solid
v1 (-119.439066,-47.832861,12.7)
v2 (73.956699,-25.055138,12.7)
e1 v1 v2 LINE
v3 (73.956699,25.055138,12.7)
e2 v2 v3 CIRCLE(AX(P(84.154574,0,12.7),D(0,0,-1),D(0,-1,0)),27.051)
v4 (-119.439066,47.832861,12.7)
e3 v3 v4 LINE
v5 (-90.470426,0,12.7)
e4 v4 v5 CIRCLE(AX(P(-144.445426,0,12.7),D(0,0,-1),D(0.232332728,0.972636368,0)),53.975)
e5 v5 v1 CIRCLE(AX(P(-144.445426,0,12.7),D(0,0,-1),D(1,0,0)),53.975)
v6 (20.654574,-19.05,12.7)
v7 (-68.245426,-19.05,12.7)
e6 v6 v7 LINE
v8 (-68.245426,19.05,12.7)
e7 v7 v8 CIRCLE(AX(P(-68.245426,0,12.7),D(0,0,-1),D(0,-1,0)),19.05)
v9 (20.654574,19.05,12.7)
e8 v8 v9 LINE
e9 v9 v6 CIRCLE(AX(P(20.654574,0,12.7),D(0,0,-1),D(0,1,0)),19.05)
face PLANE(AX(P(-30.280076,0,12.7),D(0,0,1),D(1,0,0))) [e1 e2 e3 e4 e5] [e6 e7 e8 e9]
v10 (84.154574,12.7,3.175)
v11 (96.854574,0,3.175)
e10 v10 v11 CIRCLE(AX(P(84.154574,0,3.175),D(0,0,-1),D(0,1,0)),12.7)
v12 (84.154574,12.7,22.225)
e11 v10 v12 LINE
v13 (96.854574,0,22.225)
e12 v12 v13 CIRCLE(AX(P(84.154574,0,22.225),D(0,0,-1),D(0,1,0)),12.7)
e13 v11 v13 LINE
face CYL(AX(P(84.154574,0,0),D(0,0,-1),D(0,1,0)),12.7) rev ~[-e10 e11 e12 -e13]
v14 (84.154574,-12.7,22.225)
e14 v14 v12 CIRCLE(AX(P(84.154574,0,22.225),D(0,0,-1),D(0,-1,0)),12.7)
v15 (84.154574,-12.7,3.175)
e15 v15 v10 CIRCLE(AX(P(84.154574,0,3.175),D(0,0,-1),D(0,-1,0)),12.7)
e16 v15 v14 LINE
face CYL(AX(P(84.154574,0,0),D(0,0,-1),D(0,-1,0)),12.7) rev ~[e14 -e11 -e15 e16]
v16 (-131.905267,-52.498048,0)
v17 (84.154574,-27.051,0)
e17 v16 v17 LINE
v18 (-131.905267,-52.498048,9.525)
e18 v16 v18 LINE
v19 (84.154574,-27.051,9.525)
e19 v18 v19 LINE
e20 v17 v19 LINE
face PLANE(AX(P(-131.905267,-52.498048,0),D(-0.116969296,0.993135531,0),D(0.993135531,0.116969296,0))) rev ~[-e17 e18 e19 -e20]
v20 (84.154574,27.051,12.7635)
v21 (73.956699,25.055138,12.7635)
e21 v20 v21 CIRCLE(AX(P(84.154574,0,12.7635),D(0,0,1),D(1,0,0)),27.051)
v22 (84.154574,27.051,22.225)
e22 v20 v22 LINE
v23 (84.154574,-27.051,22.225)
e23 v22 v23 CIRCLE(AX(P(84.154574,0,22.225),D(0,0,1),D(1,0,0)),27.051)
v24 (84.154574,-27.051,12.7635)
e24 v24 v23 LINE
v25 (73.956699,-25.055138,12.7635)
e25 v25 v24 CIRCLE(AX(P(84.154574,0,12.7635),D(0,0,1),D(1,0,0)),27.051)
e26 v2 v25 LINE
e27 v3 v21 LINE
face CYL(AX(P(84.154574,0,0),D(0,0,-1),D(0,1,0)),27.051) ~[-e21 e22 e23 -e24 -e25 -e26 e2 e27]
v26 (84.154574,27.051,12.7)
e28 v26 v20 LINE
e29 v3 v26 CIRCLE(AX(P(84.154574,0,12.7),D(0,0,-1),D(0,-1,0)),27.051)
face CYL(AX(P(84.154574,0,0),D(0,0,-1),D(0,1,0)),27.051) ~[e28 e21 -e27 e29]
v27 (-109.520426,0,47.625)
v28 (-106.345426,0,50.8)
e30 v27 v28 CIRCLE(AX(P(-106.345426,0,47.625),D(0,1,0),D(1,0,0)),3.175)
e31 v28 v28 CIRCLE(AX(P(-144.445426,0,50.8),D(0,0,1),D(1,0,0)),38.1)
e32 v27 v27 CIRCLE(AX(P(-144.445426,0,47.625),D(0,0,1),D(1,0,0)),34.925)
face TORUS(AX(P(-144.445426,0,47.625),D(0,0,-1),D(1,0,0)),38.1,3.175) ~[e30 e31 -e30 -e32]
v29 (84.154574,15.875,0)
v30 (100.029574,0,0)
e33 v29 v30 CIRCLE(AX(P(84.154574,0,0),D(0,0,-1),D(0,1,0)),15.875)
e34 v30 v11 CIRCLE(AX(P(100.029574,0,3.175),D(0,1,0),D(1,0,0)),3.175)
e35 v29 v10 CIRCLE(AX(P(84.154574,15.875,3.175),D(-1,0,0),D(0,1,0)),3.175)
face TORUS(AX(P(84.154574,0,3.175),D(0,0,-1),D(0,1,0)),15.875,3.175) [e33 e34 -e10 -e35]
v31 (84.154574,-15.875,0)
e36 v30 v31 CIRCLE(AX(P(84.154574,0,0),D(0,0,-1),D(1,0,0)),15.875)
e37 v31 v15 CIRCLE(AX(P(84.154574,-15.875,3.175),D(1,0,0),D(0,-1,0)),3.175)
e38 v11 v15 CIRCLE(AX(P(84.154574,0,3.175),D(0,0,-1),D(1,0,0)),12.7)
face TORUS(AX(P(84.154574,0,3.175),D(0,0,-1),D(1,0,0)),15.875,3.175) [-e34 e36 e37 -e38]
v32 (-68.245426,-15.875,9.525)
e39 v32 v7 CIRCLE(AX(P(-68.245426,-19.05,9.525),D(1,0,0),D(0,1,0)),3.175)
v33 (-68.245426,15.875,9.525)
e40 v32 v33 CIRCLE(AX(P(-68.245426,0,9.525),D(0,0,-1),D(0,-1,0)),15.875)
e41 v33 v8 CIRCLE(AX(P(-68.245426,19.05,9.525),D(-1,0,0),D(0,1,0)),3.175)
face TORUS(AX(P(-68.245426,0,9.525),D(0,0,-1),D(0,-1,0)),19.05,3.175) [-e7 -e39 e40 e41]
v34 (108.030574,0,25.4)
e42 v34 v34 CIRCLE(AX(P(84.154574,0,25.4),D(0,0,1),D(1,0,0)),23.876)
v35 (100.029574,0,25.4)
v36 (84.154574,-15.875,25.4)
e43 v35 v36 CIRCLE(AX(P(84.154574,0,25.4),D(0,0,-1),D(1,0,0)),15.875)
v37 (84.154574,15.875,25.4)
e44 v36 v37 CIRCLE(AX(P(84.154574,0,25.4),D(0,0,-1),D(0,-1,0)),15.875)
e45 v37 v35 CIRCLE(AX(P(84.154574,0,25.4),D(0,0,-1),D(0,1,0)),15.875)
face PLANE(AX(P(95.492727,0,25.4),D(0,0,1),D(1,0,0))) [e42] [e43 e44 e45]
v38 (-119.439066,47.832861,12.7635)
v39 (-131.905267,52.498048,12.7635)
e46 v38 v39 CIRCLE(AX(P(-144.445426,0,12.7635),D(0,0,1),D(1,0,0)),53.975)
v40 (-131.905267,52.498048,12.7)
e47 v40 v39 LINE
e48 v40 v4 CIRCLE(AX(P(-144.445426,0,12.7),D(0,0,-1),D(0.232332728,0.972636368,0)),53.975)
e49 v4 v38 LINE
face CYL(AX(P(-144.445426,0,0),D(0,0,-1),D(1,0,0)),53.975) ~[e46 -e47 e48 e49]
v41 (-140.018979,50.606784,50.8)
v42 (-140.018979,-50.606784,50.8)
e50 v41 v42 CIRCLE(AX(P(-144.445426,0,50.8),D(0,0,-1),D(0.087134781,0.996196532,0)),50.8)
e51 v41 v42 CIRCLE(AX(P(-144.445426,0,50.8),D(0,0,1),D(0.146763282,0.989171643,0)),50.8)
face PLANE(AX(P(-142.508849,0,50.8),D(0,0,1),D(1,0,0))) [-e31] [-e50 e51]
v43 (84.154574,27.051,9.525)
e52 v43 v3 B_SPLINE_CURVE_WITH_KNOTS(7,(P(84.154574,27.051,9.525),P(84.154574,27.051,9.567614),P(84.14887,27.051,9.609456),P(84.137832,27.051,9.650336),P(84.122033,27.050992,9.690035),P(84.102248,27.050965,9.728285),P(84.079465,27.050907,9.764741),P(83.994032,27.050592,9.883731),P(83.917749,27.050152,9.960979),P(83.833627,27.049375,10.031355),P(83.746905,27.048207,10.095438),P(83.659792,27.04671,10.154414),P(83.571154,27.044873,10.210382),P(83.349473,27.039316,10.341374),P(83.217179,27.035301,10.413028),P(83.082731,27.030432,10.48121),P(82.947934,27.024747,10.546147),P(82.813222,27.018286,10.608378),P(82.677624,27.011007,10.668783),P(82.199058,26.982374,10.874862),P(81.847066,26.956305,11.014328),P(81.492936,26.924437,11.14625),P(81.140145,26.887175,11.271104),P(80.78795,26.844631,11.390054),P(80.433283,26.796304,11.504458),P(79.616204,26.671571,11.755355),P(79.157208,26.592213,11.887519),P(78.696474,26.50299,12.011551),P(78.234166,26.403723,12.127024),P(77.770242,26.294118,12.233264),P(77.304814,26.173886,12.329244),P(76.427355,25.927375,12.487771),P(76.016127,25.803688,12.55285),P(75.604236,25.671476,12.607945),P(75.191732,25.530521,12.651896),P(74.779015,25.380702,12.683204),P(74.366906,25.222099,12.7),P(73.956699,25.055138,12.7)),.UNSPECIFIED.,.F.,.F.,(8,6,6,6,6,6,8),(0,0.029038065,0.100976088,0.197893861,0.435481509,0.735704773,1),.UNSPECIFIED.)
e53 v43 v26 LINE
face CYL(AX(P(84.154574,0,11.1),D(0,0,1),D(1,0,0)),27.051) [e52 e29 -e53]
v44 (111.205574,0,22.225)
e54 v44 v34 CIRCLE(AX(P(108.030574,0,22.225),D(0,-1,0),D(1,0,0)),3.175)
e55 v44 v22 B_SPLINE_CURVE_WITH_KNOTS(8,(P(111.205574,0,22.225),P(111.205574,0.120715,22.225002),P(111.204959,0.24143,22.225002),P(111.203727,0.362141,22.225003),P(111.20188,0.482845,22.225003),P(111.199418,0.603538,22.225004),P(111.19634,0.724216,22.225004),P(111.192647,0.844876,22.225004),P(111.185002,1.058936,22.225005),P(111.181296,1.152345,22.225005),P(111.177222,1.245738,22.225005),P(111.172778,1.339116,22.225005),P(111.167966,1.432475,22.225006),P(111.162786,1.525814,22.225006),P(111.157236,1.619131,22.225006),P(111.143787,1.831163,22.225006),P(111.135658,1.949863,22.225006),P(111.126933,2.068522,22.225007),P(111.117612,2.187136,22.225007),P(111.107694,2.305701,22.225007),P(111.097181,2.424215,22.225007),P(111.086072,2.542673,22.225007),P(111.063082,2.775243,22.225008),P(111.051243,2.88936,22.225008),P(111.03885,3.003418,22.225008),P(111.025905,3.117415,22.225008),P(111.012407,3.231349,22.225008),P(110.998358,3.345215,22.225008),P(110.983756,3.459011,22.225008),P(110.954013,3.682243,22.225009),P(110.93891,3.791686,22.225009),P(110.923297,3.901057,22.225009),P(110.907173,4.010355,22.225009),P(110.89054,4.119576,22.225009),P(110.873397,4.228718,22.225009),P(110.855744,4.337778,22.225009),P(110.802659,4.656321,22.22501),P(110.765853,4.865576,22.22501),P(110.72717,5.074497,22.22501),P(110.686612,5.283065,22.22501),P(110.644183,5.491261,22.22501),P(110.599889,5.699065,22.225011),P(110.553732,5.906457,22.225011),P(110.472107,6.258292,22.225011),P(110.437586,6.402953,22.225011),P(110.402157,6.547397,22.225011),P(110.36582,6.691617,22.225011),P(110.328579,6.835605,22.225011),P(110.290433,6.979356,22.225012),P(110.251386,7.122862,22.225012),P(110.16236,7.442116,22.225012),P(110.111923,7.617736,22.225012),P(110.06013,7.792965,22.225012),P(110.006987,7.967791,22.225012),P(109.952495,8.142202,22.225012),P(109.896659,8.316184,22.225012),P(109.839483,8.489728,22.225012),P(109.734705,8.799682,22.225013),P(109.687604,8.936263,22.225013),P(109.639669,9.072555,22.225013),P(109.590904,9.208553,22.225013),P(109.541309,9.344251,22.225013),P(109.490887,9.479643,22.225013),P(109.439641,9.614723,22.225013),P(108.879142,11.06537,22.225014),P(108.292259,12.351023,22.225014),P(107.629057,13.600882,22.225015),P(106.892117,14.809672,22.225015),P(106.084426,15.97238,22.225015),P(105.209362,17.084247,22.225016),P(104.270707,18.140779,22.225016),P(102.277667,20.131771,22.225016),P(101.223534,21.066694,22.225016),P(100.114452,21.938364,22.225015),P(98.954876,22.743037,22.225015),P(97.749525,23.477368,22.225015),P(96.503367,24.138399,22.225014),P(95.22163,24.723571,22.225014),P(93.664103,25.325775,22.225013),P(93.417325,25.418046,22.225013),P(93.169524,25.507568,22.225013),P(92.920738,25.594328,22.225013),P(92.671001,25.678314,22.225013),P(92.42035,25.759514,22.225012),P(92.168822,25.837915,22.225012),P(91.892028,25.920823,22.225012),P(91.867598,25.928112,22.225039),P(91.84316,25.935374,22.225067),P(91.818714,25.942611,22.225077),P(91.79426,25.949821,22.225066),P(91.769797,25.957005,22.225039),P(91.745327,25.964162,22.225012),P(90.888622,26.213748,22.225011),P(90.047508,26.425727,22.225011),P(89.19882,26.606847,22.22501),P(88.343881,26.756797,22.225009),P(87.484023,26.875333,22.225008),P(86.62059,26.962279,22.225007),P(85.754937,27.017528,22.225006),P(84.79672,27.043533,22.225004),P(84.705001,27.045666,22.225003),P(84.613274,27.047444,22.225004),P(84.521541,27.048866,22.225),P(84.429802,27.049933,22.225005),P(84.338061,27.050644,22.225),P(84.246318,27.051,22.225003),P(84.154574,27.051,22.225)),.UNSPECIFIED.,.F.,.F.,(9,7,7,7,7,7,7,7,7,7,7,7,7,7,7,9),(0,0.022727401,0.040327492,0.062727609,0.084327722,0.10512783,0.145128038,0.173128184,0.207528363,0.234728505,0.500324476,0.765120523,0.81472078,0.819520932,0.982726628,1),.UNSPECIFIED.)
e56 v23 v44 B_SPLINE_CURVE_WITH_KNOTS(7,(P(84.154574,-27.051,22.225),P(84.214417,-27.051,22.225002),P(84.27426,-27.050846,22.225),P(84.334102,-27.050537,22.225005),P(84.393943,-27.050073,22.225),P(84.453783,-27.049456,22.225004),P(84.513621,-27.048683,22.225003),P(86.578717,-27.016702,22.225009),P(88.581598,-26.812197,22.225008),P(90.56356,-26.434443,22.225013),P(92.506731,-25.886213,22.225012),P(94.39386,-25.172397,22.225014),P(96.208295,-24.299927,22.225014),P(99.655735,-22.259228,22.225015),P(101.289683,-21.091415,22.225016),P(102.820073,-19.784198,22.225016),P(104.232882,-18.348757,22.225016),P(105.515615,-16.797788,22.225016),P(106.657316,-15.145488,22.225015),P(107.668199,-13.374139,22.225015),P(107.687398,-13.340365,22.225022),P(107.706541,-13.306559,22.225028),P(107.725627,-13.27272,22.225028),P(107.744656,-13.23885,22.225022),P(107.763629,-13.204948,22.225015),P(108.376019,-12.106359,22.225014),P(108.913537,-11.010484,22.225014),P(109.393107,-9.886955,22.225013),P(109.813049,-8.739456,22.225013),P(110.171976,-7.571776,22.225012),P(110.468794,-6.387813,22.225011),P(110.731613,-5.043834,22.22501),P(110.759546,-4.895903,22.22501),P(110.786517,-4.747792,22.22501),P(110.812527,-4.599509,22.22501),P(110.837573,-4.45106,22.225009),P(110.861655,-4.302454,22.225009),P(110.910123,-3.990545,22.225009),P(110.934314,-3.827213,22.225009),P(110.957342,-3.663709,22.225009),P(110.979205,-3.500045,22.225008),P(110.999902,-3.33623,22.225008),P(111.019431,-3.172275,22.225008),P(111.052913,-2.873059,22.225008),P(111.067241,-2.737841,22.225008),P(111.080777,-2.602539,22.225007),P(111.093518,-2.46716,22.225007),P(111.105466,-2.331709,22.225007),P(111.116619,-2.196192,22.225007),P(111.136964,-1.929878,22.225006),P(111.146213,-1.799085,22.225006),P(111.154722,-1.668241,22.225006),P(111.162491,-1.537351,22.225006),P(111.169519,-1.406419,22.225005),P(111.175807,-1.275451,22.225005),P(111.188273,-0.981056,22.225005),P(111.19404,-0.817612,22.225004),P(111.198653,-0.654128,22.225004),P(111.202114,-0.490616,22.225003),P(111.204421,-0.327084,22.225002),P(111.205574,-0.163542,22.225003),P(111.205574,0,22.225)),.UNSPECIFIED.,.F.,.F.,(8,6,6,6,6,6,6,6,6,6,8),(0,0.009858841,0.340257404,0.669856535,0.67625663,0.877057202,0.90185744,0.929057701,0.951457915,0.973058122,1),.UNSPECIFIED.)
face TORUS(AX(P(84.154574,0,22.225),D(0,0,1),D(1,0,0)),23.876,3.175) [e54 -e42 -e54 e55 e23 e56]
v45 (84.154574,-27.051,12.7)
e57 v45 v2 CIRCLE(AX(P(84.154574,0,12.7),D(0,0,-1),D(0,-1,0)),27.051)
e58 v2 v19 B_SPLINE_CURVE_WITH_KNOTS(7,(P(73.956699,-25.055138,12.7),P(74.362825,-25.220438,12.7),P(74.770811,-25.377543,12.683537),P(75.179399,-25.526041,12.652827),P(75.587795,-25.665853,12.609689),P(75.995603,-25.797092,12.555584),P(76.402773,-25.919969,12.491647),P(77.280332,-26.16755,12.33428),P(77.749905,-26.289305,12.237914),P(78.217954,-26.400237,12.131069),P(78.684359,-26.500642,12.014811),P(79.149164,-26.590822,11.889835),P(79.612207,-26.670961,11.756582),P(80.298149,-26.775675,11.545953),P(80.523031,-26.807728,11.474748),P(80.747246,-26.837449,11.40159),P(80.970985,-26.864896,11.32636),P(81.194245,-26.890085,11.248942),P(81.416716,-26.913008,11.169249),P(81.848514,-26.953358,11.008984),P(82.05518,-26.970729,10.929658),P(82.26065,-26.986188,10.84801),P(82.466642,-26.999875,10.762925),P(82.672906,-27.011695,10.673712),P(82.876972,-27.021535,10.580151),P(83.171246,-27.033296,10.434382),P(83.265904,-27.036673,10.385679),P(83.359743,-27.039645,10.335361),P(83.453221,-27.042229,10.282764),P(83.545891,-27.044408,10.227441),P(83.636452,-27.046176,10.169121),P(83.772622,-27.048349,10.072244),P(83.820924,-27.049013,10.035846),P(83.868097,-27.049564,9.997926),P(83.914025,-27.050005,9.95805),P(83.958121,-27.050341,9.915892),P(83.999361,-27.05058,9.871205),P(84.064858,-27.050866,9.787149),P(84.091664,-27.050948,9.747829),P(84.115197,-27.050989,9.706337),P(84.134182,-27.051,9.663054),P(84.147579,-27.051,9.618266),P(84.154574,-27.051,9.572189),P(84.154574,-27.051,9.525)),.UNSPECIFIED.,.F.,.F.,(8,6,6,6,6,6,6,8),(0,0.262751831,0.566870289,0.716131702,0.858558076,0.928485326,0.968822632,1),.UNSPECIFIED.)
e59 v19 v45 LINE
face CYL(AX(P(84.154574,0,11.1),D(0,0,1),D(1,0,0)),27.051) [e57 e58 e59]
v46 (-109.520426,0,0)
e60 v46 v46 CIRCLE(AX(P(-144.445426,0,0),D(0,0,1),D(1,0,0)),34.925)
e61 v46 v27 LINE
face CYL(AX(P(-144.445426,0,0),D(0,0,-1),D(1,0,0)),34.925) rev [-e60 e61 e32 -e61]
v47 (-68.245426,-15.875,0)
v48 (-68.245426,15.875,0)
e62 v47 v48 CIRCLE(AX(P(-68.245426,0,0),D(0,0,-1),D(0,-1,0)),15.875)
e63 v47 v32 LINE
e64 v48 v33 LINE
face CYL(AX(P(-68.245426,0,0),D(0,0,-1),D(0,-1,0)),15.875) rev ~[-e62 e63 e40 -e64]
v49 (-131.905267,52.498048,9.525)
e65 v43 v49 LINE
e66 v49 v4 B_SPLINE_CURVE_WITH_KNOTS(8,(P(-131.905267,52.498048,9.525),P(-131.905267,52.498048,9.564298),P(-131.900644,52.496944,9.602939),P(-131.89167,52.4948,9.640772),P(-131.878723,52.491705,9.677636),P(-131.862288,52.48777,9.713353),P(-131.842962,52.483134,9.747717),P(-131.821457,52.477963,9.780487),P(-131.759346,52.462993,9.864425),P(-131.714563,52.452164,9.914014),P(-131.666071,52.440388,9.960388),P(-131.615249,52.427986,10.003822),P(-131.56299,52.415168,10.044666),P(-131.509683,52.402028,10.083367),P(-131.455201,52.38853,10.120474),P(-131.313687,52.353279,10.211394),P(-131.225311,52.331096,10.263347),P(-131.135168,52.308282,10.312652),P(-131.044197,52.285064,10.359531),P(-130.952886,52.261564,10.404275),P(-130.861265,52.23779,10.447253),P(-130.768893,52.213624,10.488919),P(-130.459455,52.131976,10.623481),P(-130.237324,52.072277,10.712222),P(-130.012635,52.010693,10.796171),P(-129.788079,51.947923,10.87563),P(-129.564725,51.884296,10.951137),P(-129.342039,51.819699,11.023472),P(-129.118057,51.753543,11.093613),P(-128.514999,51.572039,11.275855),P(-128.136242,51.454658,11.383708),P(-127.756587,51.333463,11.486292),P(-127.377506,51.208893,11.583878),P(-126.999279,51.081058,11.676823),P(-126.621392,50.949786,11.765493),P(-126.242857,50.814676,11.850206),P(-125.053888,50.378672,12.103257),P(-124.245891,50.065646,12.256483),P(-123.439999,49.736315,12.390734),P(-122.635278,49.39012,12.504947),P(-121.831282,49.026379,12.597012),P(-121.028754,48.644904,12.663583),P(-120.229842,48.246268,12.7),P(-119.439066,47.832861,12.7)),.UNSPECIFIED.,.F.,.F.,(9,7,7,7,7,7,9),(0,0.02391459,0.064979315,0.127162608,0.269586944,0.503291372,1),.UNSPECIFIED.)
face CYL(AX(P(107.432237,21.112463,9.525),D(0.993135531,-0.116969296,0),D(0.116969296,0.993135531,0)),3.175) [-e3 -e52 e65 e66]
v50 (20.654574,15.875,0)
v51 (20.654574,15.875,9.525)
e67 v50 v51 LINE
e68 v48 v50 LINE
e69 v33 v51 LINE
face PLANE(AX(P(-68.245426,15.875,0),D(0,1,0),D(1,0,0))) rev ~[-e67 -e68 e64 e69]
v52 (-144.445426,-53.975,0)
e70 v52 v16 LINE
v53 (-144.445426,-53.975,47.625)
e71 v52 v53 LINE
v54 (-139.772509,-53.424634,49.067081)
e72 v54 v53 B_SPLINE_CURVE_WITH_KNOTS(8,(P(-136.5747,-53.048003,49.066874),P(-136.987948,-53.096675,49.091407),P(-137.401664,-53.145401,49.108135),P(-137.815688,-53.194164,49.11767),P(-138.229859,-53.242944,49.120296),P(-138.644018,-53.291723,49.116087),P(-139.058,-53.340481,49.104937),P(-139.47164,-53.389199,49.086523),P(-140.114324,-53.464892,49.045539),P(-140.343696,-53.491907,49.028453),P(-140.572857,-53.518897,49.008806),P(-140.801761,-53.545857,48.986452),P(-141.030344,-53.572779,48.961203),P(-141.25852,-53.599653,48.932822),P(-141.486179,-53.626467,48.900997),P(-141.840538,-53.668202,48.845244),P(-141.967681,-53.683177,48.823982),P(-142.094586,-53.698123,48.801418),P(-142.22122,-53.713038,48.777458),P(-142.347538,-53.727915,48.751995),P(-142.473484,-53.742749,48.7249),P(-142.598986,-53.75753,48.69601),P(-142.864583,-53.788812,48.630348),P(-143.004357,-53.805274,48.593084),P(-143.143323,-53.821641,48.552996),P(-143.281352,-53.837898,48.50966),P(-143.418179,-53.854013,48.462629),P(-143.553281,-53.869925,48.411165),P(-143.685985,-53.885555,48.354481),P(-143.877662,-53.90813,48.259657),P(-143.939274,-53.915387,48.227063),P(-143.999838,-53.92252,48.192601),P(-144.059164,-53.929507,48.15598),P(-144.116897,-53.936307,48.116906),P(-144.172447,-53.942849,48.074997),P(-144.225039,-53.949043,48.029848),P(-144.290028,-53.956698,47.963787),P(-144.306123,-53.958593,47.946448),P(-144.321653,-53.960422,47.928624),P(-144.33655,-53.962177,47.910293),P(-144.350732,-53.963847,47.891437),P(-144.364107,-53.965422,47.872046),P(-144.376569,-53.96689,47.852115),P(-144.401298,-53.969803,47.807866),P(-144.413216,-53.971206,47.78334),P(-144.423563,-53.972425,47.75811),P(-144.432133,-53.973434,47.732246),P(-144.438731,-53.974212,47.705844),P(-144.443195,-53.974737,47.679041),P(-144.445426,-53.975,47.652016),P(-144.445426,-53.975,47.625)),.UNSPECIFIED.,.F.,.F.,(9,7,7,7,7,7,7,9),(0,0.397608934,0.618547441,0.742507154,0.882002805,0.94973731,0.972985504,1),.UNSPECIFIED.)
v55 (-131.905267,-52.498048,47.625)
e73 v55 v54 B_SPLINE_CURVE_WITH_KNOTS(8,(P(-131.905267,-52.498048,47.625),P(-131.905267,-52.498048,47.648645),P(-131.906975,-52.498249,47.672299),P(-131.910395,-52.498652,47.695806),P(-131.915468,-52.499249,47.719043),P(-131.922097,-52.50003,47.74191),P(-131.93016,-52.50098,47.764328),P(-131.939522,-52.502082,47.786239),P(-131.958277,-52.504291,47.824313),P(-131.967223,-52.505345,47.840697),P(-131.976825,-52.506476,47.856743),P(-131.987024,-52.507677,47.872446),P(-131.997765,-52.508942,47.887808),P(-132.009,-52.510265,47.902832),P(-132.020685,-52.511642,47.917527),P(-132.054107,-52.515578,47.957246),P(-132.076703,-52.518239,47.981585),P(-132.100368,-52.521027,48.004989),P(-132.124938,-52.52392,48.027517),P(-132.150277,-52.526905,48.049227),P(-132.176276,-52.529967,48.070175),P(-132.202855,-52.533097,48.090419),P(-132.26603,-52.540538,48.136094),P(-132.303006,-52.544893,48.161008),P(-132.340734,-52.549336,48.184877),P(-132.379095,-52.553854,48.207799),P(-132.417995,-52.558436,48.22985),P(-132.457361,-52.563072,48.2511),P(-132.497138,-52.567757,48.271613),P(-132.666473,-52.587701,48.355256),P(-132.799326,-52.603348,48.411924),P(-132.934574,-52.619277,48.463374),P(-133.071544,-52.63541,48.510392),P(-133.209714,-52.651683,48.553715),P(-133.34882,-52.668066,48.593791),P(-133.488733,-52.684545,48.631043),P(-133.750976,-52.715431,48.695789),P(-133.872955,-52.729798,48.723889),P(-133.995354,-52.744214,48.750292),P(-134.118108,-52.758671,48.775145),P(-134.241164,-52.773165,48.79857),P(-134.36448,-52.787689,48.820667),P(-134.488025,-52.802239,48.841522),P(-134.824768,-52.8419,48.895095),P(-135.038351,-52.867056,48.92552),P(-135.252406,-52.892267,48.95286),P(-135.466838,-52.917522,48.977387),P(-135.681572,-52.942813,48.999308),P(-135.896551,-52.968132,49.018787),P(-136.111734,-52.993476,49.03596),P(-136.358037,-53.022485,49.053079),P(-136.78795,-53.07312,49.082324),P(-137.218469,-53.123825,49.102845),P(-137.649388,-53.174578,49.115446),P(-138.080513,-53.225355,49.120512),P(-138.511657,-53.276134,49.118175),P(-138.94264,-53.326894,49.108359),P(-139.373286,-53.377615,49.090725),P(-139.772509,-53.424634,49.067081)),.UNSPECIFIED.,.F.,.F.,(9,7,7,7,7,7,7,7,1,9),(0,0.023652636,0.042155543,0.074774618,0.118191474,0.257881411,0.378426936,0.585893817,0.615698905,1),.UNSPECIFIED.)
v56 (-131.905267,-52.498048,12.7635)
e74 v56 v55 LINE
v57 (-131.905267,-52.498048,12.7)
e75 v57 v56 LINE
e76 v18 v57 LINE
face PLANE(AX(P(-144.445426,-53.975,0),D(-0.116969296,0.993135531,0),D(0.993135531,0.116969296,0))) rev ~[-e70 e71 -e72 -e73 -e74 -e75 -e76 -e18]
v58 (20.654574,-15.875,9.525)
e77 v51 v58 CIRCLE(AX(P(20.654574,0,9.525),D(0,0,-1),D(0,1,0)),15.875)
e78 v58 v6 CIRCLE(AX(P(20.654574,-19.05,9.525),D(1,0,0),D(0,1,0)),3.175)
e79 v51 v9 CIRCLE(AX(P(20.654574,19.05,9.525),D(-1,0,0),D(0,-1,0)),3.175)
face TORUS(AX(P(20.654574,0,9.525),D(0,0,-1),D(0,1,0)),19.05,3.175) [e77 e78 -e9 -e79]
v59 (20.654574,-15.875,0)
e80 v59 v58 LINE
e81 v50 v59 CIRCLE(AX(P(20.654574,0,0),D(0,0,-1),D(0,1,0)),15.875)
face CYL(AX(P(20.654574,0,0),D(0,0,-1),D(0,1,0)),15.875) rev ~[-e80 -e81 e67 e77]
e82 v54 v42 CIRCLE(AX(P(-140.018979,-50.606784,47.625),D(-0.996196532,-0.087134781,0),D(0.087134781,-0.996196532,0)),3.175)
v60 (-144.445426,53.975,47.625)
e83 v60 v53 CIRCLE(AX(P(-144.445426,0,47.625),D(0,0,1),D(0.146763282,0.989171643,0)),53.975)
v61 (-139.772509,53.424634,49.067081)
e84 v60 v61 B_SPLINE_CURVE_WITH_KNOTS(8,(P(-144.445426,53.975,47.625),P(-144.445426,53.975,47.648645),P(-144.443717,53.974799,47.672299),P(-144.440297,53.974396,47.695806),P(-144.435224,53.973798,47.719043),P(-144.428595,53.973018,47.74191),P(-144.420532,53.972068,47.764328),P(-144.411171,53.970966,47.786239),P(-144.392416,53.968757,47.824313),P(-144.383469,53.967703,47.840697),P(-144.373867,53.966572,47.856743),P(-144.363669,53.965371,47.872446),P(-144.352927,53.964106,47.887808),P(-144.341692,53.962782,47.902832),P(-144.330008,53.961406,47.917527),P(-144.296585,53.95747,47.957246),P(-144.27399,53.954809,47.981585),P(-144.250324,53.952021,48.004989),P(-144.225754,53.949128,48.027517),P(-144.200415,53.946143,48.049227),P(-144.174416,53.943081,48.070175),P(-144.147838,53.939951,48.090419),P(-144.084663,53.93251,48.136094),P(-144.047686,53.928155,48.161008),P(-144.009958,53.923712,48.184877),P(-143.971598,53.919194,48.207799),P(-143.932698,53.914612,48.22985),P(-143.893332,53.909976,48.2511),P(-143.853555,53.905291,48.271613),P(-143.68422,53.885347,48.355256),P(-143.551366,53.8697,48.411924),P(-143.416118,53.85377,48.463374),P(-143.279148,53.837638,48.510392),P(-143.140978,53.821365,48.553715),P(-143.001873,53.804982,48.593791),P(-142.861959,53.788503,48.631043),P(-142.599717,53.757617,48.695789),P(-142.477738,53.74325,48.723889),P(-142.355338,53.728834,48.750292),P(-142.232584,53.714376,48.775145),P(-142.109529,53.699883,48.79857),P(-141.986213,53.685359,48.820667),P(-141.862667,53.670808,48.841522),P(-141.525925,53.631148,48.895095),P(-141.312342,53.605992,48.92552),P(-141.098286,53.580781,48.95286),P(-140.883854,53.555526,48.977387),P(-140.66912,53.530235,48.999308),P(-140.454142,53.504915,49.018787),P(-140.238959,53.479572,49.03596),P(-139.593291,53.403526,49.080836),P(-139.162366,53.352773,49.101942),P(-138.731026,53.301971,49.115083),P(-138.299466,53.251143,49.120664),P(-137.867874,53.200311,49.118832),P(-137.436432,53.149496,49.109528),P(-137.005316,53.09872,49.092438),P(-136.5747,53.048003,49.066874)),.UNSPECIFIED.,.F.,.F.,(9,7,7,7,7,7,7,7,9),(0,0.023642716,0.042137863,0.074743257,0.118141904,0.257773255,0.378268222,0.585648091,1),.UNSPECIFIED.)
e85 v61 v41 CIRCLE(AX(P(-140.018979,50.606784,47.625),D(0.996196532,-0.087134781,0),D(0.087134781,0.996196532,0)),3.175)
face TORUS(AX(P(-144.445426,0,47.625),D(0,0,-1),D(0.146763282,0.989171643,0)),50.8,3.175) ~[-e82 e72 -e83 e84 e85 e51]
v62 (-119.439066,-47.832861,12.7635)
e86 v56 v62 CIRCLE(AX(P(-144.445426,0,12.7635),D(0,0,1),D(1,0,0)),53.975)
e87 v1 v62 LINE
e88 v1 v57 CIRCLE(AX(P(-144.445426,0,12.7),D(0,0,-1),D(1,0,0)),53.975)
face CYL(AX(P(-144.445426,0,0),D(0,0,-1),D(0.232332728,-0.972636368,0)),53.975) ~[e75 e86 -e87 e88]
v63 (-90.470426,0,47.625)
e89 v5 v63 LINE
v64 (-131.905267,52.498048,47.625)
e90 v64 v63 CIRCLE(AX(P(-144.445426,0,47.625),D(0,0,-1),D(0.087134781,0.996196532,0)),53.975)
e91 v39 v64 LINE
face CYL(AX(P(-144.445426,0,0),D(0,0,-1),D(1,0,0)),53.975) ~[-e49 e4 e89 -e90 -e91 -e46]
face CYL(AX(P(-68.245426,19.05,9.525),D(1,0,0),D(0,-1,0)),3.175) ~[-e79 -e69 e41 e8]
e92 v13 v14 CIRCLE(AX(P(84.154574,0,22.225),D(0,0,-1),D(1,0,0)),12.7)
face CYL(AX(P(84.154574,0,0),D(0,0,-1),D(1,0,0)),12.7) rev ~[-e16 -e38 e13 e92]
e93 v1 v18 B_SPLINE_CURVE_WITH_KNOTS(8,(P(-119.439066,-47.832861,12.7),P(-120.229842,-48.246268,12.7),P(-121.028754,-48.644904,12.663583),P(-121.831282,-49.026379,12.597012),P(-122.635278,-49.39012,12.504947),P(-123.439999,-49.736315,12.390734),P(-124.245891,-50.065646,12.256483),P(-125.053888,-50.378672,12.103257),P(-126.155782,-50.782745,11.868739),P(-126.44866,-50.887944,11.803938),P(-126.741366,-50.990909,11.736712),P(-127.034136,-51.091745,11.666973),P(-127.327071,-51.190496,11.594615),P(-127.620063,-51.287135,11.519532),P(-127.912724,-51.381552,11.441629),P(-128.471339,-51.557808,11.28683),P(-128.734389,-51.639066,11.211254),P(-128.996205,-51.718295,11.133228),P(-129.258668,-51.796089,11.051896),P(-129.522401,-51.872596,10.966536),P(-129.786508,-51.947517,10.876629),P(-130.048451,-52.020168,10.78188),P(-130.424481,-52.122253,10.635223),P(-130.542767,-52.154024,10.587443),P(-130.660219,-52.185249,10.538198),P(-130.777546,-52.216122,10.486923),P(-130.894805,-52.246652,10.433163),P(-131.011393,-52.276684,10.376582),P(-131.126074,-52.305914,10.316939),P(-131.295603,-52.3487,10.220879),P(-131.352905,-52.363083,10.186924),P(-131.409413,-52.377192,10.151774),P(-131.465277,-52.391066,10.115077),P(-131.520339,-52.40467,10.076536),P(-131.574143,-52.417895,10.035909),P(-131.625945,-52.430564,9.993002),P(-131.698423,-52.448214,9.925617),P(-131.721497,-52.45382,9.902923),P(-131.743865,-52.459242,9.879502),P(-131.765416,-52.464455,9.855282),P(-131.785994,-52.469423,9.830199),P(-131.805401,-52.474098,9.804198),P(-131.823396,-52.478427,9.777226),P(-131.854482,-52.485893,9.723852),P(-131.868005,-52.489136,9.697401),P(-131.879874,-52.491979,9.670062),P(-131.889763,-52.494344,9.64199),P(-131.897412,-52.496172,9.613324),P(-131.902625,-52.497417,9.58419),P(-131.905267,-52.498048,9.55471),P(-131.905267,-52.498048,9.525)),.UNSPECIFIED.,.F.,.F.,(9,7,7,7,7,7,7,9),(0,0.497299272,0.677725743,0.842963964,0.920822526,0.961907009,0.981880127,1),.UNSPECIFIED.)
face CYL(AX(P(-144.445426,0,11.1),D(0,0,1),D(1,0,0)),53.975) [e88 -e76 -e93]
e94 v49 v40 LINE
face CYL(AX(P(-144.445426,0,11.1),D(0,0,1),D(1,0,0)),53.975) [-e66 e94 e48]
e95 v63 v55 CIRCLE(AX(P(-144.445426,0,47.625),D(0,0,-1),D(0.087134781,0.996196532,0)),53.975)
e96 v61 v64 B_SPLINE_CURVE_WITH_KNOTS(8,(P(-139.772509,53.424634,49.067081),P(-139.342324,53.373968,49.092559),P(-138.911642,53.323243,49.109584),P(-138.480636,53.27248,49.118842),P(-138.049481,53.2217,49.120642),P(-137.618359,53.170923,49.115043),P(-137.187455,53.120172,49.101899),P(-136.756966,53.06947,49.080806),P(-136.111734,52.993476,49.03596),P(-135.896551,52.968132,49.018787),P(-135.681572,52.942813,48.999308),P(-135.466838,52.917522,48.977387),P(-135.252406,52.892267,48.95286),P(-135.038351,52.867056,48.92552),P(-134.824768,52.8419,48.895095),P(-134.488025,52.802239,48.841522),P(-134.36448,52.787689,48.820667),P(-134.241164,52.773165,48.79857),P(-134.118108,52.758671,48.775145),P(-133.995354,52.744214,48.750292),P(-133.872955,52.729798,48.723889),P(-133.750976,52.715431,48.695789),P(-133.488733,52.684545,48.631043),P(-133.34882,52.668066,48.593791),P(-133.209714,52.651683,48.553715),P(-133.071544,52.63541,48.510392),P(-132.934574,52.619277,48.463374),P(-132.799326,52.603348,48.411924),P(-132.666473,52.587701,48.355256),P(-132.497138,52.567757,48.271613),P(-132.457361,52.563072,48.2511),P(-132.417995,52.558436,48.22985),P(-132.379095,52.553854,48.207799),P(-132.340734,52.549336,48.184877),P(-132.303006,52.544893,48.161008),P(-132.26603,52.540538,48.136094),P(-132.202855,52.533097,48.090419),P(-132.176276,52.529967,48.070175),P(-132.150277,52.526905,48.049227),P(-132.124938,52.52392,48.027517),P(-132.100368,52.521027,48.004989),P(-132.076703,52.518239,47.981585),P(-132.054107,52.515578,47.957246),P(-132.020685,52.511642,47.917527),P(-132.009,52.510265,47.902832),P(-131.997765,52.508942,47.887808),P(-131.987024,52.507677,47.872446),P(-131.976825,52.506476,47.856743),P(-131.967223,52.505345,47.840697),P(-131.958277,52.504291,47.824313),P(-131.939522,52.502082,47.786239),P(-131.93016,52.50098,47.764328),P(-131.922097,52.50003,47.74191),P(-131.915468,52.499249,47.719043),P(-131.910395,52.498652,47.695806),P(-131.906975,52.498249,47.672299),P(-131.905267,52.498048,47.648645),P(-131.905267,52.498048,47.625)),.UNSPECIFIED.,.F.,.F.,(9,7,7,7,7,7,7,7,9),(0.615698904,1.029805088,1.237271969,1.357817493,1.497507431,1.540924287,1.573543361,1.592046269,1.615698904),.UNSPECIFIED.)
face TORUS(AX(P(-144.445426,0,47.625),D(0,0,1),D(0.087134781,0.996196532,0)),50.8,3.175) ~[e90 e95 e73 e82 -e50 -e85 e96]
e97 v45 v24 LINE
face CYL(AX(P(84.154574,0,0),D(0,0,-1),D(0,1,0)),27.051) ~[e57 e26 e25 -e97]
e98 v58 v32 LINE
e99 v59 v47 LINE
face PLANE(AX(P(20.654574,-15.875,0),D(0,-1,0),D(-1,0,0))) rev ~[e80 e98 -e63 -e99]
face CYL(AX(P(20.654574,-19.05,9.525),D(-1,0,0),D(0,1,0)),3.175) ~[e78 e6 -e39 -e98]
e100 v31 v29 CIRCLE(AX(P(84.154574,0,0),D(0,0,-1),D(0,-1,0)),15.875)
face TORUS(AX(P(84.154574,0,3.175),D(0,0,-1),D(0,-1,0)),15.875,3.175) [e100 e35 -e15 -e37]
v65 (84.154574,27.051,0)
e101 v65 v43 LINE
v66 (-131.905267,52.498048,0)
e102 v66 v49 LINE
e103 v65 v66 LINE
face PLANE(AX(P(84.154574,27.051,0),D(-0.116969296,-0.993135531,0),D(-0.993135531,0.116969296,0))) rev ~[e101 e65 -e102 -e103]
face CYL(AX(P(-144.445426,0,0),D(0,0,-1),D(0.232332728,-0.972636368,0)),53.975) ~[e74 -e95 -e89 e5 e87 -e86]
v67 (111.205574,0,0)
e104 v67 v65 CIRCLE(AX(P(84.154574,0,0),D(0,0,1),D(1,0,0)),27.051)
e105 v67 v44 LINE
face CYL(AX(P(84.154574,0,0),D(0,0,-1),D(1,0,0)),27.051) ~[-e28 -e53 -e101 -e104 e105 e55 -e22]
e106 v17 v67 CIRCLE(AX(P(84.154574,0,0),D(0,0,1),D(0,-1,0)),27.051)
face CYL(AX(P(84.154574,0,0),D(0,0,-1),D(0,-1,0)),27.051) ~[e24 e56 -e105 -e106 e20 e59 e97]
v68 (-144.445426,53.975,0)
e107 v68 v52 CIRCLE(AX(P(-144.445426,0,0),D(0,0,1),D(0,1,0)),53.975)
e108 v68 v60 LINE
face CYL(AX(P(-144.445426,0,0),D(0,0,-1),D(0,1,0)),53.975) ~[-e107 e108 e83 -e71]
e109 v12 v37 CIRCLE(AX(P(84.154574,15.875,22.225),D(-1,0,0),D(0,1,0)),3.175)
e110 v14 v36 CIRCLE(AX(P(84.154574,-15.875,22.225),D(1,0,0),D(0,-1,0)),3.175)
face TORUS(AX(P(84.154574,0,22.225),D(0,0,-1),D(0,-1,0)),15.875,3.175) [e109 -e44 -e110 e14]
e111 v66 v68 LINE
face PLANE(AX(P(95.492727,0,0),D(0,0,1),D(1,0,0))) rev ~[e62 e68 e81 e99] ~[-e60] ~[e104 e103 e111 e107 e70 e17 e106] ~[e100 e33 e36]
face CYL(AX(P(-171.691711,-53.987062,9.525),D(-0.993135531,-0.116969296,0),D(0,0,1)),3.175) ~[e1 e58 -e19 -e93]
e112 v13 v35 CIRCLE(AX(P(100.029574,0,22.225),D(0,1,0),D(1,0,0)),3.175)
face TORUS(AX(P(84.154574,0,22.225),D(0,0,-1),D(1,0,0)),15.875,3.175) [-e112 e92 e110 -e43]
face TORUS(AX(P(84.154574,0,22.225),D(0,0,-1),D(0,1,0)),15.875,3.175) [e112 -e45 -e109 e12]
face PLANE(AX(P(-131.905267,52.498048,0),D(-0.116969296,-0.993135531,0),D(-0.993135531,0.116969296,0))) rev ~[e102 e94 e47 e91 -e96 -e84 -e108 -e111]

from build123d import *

# Parameters (mm, degrees)
F0_R         = 34.925
F1_DEPTH     = 50.8
F2_DEPTH     = 12.7
F3_DEPTH     = 25.4
F4_T2_ANGLE  = 170.0024112312
F4_T4_ANGLE  = 196.8788005765
F4_T8_DEPTH  = 281.0532283158
F4_S9_R      = 27.051
F4_T10_DEPTH = 142
F4_S11_R     = 53.975
F4_T12_DEPTH = 142
F4_T16_DEPTH = 281.0532283158
F4_S17_R     = 27.051
F4_T18_DEPTH = 142
F4_S19_R     = 53.975
F4_T20_DEPTH = 142
F5_R         = 3.175


# Not quite as in the source:
# - a fillet or chamfer that OpenCascade refuses, or shapes differently, is made with other operations: its cross-section is extruded or revolved along the edge and cut away or added


with BuildPart() as f1:
    # F0 (on Top) → F1 (new body)
    with BuildSketch(Plane.XY):
        with BuildLine():
            Line((-131.9052666893, 52.4980479424), (-144.4454256691, 53.975))
            ThreePointArc((-144.4454256691, 53.975), (-198.4204256691, 0), (-144.4454256691, -53.975))
            Line((-144.4454256691, -53.975), (-131.9052666893, -52.4980479424))
            ThreePointArc((-131.9052666893, -52.4980479424), (-102.0770665674, -33.4398380981), (-90.4704256691, 0))
            ThreePointArc((-90.4704256691, 0), (-102.0770665674, 33.4398380981), (-131.9052666893, 52.4980479424))
        make_face()
        with Locations((-144.4454256691, 0)):
            Circle(F0_R, mode=Mode.SUBTRACT)
    extrude(amount=F1_DEPTH)

    # F0 (on Top) → F2 (join)
    with BuildSketch(Plane.XY):
        with BuildLine():
            Line((84.1545743309, 27.051), (-131.9052666893, 52.4980479424))
            ThreePointArc((-131.9052666893, 52.4980479424), (-102.0770665674, 33.4398380981), (-90.4704256691, 0))
            ThreePointArc((-90.4704256691, 0), (-102.0770665674, -33.4398380981), (-131.9052666893, -52.4980479424))
            Line((-131.9052666893, -52.4980479424), (84.1545743309, -27.051))
            ThreePointArc((84.1545743309, -27.051), (57.1035743309, 0), (84.1545743309, 27.051))
        make_face()
        with BuildLine():
            ThreePointArc((-68.2454256691, -15.875), (-84.1204256691, 0), (-68.2454256691, 15.875))
            Line((-68.2454256691, 15.875), (20.6545743309, 15.875))
            ThreePointArc((20.6545743309, 15.875), (36.5295743309, 0), (20.6545743309, -15.875))
            Line((20.6545743309, -15.875), (-68.2454256691, -15.875))
        make_face(mode=Mode.SUBTRACT)
    extrude(amount=F2_DEPTH)

    # F0 (on Top) → F3 (join)
    with BuildSketch(Plane.XY):
        with BuildLine():
            ThreePointArc((111.2055743309, 0), (103.2825198687, 19.1279455379), (84.1545743309, 27.051))
            Line((84.1545743309, 27.051), (84.1545743309, 12.7))
            ThreePointArc((84.1545743309, 12.7), (93.1348304519, 8.9802561211), (96.8545743309, 0))
            ThreePointArc((96.8545743309, 0), (93.1348304519, -8.9802561211), (84.1545743309, -12.7))
            Line((84.1545743309, -12.7), (84.1545743309, -27.051))
            ThreePointArc((84.1545743309, -27.051), (103.2825198687, -19.1279455379), (111.2055743309, 0))
        make_face()
        with BuildLine():
            Line((84.1545743309, 12.7), (84.1545743309, 27.051))
            ThreePointArc((84.1545743309, 27.051), (57.1035743309, 0), (84.1545743309, -27.051))
            Line((84.1545743309, -27.051), (84.1545743309, -12.7))
            ThreePointArc((84.1545743309, -12.7), (71.4545743309, 0), (84.1545743309, 12.7))
        make_face()
    extrude(amount=F3_DEPTH)

    # F4: fillet of radius 3.175 on 5 edges, made by hand

    # F4_s1 → F4_t2 (revolve, cut)
    with BuildSketch(Plane(origin=(-143.3487281035, 12.5383492192, 0), x_dir=(0, 0, 1), z_dir=(-0.9961965318, 0.0871347808, 0))):
        with BuildLine():
            ThreePointArc((47.625, 41.3887794913), (49.8700640303, 40.4588435216), (50.8, 38.2137794913))
            Line((50.8, 38.2137794913), (50.8635, 38.2137794913))
            Line((50.8635, 38.2137794913), (50.8635, 41.4522794913))
            Line((50.8635, 41.4522794913), (47.625, 41.4522794913))
            Line((47.625, 41.4522794913), (47.625, 41.3887794913))
        make_face()
    revolve(axis=Axis((-144.4454256691, 0, 50.8), (0, 0, -1)), revolution_arc=F4_T2_ANGLE, mode=Mode.SUBTRACT)

    # F4_s3 → F4_t4 (revolve, cut)
    with BuildSketch(Plane(origin=(-141.3341490778, 20.9697312712, 0), x_dir=(0, 0, 1), z_dir=(0.9891716429, -0.1467632817, 0))):
        with BuildLine():
            ThreePointArc((50.8, -29.6007153042), (49.8700640303, -31.8457793344), (47.625, -32.7757153042))
            Line((47.625, -32.7757153042), (47.625, -32.8392153042))
            Line((47.625, -32.8392153042), (50.8635, -32.8392153042))
            Line((50.8635, -32.8392153042), (50.8635, -29.6007153042))
            Line((50.8635, -29.6007153042), (50.8, -29.6007153042))
        make_face()
    revolve(axis=Axis((-144.4454256691, 0, 50.8), (0, 0, 1)), revolution_arc=F4_T4_ANGLE, mode=Mode.SUBTRACT)


with BuildPart() as f4_tool6:
    # F4_s7 → F4_t8 (new body)
    with BuildSketch(Plane(origin=(-175.6141368199, -20.683442781, 0), x_dir=(0, 0, 1), z_dir=(0.9931355314, 0.1169692959, 0))):
        with BuildLine():
            ThreePointArc((12.7, 33.5338105694), (11.7700640303, 35.7788745997), (9.525, 36.7088105694))
            Line((9.525, 36.7088105694), (9.525, 36.7723105694))
            Line((9.525, 36.7723105694), (12.7635, 36.7723105694))
            Line((12.7635, 36.7723105694), (12.7635, 33.5338105694))
            Line((12.7635, 33.5338105694), (12.7, 33.5338105694))
        make_face()
    extrude(amount=F4_T8_DEPTH)

    # F4_s9 → F4_t10 (cut, symmetric)
    with BuildSketch(Plane.XY.offset(11.1)):
        with Locations((84.1545743309, 0)):
            Circle(F4_S9_R)
    extrude(amount=F4_T10_DEPTH, both=True, mode=Mode.SUBTRACT)

    # F4_s11 → F4_t12 (cut, symmetric)
    with BuildSketch(Plane.XY.offset(11.1)):
        with Locations((-144.4454256691, 0)):
            Circle(F4_S11_R)
    extrude(amount=F4_T12_DEPTH, both=True, mode=Mode.SUBTRACT)


with BuildPart() as f1_1:
    add(f1.part)

    # F4_t5: cut F4_tool6
    add(f4_tool6.part, mode=Mode.SUBTRACT)


with BuildPart() as f4_tool14:
    # F4_s15 → F4_t16 (new body)
    with BuildSketch(Plane(origin=(103.5098104467, -12.1911554526, 0), x_dir=(0, 0, 1), z_dir=(-0.9931355314, 0.1169692959, 0))):
        with BuildLine():
            ThreePointArc((9.525, 36.7088105694), (11.7700640303, 35.7788745997), (12.7, 33.5338105694))
            Line((12.7, 33.5338105694), (12.7635, 33.5338105694))
            Line((12.7635, 33.5338105694), (12.7635, 36.7723105694))
            Line((12.7635, 36.7723105694), (9.525, 36.7723105694))
            Line((9.525, 36.7723105694), (9.525, 36.7088105694))
        make_face()
    extrude(amount=F4_T16_DEPTH)

    # F4_s17 → F4_t18 (cut, symmetric)
    with BuildSketch(Plane.XY.offset(11.1)):
        with Locations((84.1545743309, 0)):
            Circle(F4_S17_R)
    extrude(amount=F4_T18_DEPTH, both=True, mode=Mode.SUBTRACT)

    # F4_s19 → F4_t20 (cut, symmetric)
    with BuildSketch(Plane.XY.offset(11.1)):
        with Locations((-144.4454256691, 0)):
            Circle(F4_S19_R)
    extrude(amount=F4_T20_DEPTH, both=True, mode=Mode.SUBTRACT)


with BuildPart() as f1_2:
    add(f1_1.part)

    # F4_t13: cut F4_tool14
    add(f4_tool14.part, mode=Mode.SUBTRACT)

    # F4_s21 → F4_t22 (revolve, cut)
    with BuildSketch(Plane.XZ):
        with BuildLine():
            ThreePointArc((111.2055743309, 22.225), (110.2756383611, 24.4700640303), (108.0305743309, 25.4))
            Line((108.0305743309, 25.4), (108.0305743309, 25.4635))
            Line((108.0305743309, 25.4635), (111.2690743309, 25.4635))
            Line((111.2690743309, 25.4635), (111.2690743309, 22.225))
            Line((111.2690743309, 22.225), (111.2055743309, 22.225))
        make_face()
    revolve(axis=Axis((84.1545743309, 0, 25.4), (0, 0, 1)), mode=Mode.SUBTRACT)

    # F5
    f5_edges = [f1_2.edges().sort_by_distance(p)[0] for p in [
        (-179.370426, 0, 50.8),
        (-23.795426, -15.875, 12.7),
        (96.854574, 0, 12.7),
        (71.454574, 0, 0),
        (71.454574, 0, 25.4),
        (36.529574, 0, 12.7),
        (-23.795426, 15.875, 12.7),
        (-84.120426, 0, 12.7),
    ]]
    fillet(f5_edges, radius=F5_R)


solid = f1_2.part
